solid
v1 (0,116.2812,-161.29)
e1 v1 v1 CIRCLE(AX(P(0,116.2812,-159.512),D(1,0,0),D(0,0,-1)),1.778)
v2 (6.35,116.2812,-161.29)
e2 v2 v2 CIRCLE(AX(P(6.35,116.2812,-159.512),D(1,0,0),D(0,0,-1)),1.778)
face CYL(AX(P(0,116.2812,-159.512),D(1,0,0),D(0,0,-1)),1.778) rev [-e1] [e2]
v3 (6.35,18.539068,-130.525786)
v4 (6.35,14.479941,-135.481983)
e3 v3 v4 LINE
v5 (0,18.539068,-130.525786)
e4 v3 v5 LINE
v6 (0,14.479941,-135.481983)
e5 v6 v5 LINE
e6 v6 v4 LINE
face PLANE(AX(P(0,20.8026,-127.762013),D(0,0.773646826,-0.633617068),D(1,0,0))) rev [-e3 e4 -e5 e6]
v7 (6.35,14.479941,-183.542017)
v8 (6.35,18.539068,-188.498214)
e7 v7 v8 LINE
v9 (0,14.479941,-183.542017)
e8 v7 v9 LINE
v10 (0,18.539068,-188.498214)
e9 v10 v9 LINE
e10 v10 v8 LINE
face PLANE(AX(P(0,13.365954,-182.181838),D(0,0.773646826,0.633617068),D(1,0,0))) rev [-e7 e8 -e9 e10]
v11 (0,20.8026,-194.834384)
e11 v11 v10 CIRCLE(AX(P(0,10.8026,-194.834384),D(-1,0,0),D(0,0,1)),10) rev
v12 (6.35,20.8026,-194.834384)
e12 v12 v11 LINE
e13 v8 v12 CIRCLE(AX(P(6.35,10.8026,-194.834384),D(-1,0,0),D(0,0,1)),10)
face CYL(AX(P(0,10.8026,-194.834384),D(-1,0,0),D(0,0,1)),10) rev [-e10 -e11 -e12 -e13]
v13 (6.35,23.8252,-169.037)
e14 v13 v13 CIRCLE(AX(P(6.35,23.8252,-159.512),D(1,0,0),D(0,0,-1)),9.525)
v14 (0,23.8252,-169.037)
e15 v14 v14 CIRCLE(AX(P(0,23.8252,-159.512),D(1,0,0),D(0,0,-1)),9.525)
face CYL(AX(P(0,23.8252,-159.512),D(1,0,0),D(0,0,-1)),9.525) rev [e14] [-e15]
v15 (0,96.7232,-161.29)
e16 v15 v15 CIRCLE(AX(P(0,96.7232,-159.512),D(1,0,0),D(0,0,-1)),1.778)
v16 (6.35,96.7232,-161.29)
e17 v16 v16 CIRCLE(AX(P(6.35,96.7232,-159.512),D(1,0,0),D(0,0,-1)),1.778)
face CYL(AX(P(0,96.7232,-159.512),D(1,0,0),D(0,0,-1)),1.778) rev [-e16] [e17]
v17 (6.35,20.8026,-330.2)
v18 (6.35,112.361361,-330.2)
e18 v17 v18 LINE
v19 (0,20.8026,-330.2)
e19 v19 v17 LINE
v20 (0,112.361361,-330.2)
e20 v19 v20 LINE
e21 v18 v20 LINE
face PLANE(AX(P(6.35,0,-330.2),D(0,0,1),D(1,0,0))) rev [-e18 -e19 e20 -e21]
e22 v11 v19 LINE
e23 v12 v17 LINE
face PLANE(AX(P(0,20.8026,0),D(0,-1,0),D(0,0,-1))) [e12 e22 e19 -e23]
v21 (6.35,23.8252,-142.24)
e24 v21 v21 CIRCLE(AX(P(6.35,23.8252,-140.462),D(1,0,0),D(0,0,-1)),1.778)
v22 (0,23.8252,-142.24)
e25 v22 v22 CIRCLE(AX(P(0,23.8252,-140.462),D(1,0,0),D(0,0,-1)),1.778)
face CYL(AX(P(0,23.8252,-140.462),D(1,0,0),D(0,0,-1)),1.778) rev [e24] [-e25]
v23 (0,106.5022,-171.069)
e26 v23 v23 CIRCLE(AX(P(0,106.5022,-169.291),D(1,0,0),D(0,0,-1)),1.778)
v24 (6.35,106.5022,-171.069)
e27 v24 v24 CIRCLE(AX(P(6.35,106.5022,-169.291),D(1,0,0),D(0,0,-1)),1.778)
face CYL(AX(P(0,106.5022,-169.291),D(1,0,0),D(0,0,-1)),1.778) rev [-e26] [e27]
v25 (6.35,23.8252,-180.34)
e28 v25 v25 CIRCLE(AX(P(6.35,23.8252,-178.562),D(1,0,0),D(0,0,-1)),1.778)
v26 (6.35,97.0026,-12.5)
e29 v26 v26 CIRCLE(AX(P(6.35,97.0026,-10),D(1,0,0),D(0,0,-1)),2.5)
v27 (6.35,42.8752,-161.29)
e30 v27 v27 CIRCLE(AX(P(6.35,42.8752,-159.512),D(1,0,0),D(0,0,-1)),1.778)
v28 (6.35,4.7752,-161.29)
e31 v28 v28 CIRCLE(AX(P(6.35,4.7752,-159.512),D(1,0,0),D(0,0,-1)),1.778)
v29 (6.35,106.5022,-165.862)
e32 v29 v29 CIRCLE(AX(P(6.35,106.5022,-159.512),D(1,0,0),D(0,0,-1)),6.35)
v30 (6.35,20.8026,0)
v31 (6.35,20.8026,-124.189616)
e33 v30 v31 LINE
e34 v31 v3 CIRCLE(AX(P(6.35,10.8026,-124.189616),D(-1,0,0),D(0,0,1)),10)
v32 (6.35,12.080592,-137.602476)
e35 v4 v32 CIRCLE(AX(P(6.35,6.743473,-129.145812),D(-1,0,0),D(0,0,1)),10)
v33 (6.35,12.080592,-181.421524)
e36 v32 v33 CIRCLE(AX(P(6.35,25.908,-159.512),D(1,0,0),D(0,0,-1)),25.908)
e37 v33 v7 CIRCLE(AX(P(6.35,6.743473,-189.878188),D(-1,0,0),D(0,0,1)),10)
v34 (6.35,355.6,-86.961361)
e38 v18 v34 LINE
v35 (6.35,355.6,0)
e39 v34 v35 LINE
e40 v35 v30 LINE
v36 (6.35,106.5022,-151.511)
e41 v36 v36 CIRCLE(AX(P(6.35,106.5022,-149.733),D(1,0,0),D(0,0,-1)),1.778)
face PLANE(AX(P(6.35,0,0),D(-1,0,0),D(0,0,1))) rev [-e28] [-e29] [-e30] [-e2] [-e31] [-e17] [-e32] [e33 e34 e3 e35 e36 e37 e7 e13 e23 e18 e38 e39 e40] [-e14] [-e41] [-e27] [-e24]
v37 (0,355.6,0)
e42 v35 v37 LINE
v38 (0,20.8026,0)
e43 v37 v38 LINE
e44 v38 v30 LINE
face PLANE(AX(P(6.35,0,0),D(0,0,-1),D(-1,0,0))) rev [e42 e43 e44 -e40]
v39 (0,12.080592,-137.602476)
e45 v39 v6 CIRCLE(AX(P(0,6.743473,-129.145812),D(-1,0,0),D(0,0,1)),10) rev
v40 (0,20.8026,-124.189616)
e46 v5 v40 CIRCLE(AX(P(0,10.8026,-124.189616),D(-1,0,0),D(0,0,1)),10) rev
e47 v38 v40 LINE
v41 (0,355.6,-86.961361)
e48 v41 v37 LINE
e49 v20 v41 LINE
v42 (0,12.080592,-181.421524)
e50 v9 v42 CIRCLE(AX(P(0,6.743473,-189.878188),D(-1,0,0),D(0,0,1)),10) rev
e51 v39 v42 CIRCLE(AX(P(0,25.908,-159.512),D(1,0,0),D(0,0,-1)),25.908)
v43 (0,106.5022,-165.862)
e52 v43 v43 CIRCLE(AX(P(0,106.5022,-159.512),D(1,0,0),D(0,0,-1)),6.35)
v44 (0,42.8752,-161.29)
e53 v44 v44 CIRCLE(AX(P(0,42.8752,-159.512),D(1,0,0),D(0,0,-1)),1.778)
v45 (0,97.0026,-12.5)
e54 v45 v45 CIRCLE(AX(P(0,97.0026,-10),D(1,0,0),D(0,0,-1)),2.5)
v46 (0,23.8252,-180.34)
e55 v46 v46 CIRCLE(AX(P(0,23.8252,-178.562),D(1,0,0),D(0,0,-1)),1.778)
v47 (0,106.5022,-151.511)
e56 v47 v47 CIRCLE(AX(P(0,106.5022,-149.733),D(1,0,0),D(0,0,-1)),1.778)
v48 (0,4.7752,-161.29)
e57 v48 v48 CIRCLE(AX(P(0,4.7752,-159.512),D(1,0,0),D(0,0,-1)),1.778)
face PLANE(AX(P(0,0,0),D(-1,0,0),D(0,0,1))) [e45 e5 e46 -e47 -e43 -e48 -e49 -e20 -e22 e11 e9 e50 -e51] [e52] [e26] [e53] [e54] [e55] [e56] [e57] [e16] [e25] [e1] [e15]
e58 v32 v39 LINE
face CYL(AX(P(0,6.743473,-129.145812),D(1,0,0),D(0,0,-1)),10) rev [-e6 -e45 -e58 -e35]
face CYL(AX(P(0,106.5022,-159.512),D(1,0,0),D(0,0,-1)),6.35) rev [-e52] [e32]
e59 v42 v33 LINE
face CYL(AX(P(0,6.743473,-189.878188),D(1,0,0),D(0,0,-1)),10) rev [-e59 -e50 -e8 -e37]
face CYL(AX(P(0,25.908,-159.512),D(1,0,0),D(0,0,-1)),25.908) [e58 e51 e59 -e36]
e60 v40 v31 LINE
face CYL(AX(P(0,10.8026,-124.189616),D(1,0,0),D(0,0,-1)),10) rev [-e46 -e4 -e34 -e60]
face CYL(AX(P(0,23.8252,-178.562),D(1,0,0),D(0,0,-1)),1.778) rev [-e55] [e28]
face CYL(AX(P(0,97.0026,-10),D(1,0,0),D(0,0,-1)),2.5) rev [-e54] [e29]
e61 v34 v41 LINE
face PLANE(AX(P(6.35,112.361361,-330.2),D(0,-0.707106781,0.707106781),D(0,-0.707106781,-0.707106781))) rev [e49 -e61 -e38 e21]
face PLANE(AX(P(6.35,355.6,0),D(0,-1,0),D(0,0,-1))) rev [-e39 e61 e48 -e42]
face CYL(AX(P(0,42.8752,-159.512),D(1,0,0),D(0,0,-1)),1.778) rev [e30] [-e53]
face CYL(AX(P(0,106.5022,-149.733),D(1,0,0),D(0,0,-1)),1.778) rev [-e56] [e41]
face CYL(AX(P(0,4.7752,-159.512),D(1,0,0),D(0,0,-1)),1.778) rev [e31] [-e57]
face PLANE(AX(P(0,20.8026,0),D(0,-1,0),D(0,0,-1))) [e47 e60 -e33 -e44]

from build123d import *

# Parameters (mm, degrees)
MAIN_PLATE_SIZE_DEPTH                         = 6.35
SKETCH2_R                                     = 9.525
SKETCH2_R_2                                   = 1.778
BOTTOM_SHAFT_MOUNTING_HOLES_DEPTH             = 486.307863629
SKETCH3_R                                     = 6.35
SKETCH3_R_2                                   = 1.778
TOP_BATTERY_BOX_MOUNTING_HOLES_DEPTH          = 486.307863629
THIS_IS_TO_MATCH_THE_IDIOTIC_DESIGN_OF_B_SIZE = 6.35
THIS_IS_TO_MATCH_THE_IDIOTIC_DESIGN_2_R       = 10
SKETCH4_R                                     = 2.5
F_20MM_EXTRUSION_MOUNT_DEPTH                  = 486.307863629


with BuildPart() as part:
    # Sketch1 → Main Plate Size (new body)
    with BuildSketch(Plane(origin=(0, 0, 0), x_dir=(0, 0, -1), z_dir=(1, 0, 0))):
        Polygon((330.2, 112.361360549), (86.961360549, 355.6), (0, 355.6), (0, 0), (330.2, 0), align=None)
    extrude(amount=MAIN_PLATE_SIZE_DEPTH)

    # Sketch2 → Bottom Shaft Mounting Holes (cut, through all)
    with BuildSketch(Plane(origin=(6.35, 0, 0), x_dir=(0, 0, -1), z_dir=(1, 0, 0))):
        with BuildLine():
            Line((134.1120127, 20.8026), (0, 20.8026))
            Line((0, 20.8026), (0, 0))
            Line((0, 0), (159.512000023, 0))
            ThreePointArc((159.512000023, 0), (143.096249024, 5.864358018), (134.1120127, 20.8026))
        make_face()
        with BuildLine():
            ThreePointArc((184.9119873, 20.8026), (175.927750994, 5.864358033), (159.512000023, 0))
            Line((159.512000023, 0), (177.8, 0))
            Line((177.8, 0), (330.2, 0))
            Line((330.2, 0), (330.2, 20.8026))
            Line((330.2, 20.8026), (184.9119873, 20.8026))
        make_face()
        with Locations((159.512, 23.8252)):
            Circle(SKETCH2_R)
        with Locations((159.512, 4.7752)):
            Circle(SKETCH2_R_2)
        with Locations((178.562, 23.8252)):
            Circle(SKETCH2_R_2)
        with Locations((159.512, 42.8752)):
            Circle(SKETCH2_R_2)
        with Locations((140.462, 23.8252)):
            Circle(SKETCH2_R_2)
    extrude(amount=-BOTTOM_SHAFT_MOUNTING_HOLES_DEPTH, mode=Mode.SUBTRACT)

    # Sketch3 → Top Battery Box Mounting Holes (cut, through all)
    with BuildSketch(Plane(origin=(6.35, 0, 0), x_dir=(0, 0, -1), z_dir=(1, 0, 0))):
        with Locations((159.512, 106.5022)):
            Circle(SKETCH3_R)
        with Locations((149.733, 106.5022)):
            Circle(SKETCH3_R_2)
        with Locations((159.512, 116.2812)):
            Circle(SKETCH3_R_2)
        with Locations((169.291, 106.5022)):
            Circle(SKETCH3_R_2)
        with Locations((159.512, 96.7232)):
            Circle(SKETCH3_R_2)
    extrude(amount=-TOP_BATTERY_BOX_MOUNTING_HOLES_DEPTH, mode=Mode.SUBTRACT)

    # This is to match the idiotic Design of B
    # the kernel refuses this chamfer: 6.35 mm, written as the material it adds along each edge
    with BuildSketch(Plane(origin=(6.35, 20.8026, -134.1120127), x_dir=(0, -0.9387383646661523, -0.34463064678568256), z_dir=(-1, 0, 0))) as this_is_to_match_the_idiotic_design_of_b_piece_1:
        with BuildLine():
            Line((7.921958409, 0), (-THIS_IS_TO_MATCH_THE_IDIOTIC_DESIGN_OF_B_SIZE * 0.344630646786, THIS_IS_TO_MATCH_THE_IDIOTIC_DESIGN_OF_B_SIZE * 0.938738364666))
            Line((-THIS_IS_TO_MATCH_THE_IDIOTIC_DESIGN_OF_B_SIZE * 0.344630646786, THIS_IS_TO_MATCH_THE_IDIOTIC_DESIGN_OF_B_SIZE * 0.938738364666), (0, 0))
            ThreePointArc((0, 0), (4.071959946, 0.304342453), (7.921958409, 0))
        make_face()
    extrude(amount=6.35)
    with BuildSketch(Plane(origin=(6.35, 20.8026, -184.9119873), x_dir=(0, 0, -1), z_dir=(-1, 0, 0))) as this_is_to_match_the_idiotic_design_of_b_piece_2:
        with BuildLine():
            Line((THIS_IS_TO_MATCH_THE_IDIOTIC_DESIGN_OF_B_SIZE, 0), (-2.73014965, 7.436646282))
            ThreePointArc((-2.73014965, 7.436646282), (-1.117624253, 3.927390757), (0, 0))
            Line((0, 0), (THIS_IS_TO_MATCH_THE_IDIOTIC_DESIGN_OF_B_SIZE, 0))
        make_face()
    extrude(amount=6.35)

    # This is to match the idiotic Design  2
    this_is_to_match_the_idiotic_design_2_edges = [part.edges().sort_by_distance(p)[0] for p in [
        (3.175, 13.365953718, -136.84216235),
        (3.175, 13.365953718, -182.18183765),
        (3.175, 20.8026, -191.2619873),
        (3.175, 20.8026, -127.7620127),
    ]]
    fillet(this_is_to_match_the_idiotic_design_2_edges, radius=THIS_IS_TO_MATCH_THE_IDIOTIC_DESIGN_2_R)

    # Sketch4 → 20mm Extrusion Mount (cut, through all)
    with BuildSketch(Plane(origin=(6.35, 0, 0), x_dir=(0, 0, -1), z_dir=(1, 0, 0))):
        with Locations((10, 97.0026)):
            Circle(SKETCH4_R)
    extrude(amount=-F_20MM_EXTRUSION_MOUNT_DEPTH, mode=Mode.SUBTRACT)


solid = part.part
